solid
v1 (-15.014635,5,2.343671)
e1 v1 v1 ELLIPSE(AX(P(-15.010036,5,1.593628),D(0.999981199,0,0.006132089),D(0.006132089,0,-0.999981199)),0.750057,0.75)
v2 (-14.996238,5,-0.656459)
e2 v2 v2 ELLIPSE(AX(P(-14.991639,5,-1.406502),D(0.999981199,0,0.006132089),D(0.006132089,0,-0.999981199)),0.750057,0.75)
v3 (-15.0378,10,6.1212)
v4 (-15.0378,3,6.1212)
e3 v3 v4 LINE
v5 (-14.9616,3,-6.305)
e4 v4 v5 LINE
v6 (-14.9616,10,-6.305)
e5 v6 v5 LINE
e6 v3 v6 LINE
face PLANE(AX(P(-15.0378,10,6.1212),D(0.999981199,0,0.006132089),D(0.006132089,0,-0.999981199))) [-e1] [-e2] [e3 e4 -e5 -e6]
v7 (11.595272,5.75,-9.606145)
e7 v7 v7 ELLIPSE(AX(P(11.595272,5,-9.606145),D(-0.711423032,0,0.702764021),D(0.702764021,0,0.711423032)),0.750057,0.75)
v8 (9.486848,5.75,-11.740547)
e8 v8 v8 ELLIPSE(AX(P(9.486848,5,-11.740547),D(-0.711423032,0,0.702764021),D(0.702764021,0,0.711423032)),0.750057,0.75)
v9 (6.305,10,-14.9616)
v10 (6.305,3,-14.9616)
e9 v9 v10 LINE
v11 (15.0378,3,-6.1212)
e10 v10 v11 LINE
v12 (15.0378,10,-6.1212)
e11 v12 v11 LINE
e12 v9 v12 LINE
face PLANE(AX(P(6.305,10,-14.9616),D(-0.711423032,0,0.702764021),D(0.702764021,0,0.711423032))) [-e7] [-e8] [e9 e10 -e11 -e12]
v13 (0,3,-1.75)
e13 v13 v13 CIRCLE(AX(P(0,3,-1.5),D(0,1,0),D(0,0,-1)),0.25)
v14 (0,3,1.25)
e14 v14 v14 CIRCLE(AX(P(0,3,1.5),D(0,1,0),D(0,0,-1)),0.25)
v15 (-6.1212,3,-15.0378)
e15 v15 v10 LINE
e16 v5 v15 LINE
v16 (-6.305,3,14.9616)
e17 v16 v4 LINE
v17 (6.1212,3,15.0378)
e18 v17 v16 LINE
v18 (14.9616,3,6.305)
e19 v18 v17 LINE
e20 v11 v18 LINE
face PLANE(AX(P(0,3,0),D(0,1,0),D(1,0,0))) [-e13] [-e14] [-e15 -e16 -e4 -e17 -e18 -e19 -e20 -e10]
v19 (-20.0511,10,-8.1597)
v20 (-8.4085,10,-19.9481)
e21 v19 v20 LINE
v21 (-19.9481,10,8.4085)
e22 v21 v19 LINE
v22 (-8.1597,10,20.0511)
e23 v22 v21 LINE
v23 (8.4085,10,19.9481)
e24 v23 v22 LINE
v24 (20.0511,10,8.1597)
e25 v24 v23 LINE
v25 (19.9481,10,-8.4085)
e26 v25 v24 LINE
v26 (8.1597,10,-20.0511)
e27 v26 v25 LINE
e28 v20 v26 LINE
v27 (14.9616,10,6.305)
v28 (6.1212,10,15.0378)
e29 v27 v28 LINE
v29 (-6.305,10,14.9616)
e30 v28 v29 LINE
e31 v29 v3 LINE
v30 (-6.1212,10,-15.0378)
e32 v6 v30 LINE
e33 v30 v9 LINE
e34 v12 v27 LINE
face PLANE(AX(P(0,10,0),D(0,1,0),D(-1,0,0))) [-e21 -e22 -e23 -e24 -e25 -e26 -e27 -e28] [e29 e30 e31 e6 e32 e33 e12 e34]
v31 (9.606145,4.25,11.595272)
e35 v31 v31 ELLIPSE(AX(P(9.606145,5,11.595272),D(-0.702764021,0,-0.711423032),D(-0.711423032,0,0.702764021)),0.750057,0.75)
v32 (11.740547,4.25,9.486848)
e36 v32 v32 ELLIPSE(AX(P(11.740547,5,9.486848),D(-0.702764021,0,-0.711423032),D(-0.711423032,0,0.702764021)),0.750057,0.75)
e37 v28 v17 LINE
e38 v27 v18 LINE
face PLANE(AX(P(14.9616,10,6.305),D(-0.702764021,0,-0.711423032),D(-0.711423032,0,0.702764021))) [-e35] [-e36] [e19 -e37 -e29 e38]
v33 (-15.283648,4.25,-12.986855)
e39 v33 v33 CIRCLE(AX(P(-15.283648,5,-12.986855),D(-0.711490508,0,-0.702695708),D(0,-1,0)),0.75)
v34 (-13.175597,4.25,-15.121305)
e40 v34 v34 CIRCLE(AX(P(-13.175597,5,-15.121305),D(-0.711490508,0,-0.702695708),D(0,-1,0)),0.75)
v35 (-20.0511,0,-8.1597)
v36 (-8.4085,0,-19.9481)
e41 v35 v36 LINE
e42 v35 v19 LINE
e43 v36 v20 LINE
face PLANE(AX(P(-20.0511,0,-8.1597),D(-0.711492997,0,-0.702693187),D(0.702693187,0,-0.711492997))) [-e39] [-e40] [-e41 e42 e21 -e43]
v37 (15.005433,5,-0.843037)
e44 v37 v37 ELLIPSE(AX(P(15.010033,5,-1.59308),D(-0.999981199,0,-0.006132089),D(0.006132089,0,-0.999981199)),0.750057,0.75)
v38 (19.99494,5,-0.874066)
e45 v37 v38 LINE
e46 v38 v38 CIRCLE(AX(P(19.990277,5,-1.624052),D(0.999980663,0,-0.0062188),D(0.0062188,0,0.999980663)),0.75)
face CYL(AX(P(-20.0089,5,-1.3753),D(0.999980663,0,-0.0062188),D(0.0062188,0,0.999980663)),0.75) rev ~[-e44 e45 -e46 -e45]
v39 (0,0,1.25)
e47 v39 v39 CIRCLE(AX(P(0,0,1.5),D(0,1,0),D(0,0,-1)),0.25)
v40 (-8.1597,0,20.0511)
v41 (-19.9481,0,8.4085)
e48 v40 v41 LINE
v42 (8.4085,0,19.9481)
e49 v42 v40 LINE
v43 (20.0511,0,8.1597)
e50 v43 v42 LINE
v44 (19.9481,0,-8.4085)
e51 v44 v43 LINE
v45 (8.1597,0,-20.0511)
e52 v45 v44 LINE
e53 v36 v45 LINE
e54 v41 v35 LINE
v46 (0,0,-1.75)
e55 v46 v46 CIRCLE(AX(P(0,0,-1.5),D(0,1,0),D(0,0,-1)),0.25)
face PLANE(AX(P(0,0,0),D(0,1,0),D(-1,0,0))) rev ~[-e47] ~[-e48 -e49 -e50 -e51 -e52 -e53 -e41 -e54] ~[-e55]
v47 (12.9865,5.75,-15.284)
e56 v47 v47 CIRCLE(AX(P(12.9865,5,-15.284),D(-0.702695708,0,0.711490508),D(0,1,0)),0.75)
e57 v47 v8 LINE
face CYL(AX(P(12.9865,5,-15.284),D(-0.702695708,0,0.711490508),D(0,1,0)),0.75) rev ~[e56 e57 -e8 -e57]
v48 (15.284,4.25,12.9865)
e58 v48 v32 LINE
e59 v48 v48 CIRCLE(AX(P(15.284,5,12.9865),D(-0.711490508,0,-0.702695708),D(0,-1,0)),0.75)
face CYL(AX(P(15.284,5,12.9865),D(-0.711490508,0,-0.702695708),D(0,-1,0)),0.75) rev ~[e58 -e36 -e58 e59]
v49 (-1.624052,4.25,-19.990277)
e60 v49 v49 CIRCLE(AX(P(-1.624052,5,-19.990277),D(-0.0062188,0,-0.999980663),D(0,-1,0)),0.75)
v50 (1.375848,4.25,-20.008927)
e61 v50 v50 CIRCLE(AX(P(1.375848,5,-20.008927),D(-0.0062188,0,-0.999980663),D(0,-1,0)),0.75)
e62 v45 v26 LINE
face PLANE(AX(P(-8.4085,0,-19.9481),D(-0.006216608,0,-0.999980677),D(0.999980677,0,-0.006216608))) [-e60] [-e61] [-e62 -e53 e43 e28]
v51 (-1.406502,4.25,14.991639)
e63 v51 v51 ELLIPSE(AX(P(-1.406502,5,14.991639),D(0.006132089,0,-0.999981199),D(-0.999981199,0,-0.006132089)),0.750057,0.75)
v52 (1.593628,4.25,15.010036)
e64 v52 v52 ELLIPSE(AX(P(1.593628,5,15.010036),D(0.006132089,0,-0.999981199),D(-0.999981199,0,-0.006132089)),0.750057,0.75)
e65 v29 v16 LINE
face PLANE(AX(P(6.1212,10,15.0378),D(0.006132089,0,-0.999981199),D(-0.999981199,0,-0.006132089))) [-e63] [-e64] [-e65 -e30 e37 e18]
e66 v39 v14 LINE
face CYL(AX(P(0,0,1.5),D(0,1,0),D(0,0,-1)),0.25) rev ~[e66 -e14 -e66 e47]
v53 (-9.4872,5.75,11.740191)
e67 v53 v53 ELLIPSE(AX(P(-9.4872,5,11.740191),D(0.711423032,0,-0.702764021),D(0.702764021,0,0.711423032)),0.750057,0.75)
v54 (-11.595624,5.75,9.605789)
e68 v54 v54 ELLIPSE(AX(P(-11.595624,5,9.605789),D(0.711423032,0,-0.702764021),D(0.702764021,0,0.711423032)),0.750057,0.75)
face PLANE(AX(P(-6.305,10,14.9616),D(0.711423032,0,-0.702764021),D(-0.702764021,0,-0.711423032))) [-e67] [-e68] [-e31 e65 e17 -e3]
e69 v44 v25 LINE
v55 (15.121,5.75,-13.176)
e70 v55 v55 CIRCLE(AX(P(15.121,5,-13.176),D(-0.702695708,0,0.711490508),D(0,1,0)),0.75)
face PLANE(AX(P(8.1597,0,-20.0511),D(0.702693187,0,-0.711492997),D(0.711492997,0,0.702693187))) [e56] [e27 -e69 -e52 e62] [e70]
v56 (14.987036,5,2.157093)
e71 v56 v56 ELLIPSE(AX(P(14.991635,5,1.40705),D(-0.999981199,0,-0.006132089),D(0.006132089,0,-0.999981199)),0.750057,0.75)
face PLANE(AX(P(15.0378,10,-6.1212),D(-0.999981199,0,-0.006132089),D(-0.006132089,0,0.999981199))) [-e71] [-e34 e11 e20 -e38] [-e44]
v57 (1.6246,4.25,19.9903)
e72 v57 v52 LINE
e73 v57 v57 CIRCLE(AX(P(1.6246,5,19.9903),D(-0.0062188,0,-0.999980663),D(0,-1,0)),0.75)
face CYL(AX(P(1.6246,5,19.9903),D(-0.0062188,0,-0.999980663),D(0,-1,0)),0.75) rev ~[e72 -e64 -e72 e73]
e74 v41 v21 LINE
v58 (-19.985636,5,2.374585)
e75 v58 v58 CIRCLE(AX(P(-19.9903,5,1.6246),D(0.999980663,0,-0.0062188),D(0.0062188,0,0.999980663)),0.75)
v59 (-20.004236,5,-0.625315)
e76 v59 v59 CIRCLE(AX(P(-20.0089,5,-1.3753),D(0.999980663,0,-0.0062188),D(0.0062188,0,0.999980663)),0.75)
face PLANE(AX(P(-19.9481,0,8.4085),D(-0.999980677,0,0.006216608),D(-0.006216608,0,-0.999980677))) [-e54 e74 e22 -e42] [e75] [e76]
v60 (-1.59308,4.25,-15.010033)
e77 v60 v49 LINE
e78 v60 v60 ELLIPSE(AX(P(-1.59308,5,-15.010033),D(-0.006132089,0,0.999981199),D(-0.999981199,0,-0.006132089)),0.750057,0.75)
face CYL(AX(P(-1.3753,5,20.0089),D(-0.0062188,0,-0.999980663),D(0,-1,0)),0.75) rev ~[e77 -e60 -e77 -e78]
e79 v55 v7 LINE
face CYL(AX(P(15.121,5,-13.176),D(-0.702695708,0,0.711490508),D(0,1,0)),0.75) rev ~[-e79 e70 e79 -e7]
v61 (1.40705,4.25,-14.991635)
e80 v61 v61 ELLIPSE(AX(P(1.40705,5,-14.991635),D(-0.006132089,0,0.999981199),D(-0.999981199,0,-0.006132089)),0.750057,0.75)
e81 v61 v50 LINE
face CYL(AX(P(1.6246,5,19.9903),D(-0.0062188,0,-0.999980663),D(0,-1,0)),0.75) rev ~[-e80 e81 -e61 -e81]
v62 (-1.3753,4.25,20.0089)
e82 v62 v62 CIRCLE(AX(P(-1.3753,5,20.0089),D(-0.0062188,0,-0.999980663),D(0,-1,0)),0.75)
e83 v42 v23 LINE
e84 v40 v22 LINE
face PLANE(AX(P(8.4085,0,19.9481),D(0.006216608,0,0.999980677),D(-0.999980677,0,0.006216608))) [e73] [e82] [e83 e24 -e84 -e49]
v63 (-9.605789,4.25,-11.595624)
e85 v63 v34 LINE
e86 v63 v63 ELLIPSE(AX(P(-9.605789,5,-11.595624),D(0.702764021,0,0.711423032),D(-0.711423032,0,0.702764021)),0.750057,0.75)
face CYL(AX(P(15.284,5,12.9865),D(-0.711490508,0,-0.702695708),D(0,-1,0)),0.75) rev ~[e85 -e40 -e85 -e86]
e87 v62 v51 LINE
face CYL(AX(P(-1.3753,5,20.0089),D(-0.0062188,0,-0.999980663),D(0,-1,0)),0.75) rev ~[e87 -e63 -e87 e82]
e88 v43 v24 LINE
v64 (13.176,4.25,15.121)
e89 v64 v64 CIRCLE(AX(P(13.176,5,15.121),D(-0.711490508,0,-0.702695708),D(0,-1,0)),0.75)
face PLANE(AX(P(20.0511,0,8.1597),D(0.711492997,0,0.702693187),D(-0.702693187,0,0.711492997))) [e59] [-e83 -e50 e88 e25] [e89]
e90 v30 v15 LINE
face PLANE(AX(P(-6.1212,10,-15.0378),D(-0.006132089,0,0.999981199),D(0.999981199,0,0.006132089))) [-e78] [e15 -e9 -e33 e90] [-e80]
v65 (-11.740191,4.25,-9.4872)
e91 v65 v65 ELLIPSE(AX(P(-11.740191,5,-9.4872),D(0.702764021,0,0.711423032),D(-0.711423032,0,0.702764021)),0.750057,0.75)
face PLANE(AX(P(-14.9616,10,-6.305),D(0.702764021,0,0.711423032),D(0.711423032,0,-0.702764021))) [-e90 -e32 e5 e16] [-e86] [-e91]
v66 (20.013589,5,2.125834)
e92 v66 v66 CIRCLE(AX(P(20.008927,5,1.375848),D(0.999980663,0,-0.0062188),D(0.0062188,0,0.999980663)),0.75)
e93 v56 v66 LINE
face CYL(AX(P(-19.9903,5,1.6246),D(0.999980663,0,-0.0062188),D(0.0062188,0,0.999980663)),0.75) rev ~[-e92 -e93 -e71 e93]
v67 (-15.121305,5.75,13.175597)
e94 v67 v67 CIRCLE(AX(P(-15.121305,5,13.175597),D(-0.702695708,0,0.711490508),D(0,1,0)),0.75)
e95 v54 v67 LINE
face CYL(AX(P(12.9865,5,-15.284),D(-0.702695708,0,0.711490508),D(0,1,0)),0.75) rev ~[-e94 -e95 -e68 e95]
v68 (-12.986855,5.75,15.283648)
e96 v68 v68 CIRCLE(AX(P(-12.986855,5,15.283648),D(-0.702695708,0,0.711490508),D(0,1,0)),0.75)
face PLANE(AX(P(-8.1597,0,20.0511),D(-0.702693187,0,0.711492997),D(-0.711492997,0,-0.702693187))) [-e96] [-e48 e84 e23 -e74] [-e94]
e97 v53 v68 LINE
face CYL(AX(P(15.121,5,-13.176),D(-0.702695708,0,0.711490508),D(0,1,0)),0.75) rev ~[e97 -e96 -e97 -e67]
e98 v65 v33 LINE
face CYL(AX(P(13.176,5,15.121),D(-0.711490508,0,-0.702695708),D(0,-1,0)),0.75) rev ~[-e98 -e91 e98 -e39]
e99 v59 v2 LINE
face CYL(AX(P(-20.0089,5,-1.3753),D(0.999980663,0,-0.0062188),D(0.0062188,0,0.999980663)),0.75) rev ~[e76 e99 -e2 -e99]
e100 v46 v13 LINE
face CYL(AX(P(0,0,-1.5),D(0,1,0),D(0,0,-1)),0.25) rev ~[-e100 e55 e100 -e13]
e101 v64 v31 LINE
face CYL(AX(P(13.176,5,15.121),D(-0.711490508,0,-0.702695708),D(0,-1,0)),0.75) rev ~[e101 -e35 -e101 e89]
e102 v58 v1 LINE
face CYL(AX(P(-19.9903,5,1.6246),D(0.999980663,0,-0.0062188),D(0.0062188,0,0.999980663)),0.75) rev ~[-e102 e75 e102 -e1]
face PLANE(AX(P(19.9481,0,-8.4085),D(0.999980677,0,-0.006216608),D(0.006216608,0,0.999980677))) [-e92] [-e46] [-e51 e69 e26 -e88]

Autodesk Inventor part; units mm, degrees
ref_plane "YZ Plane" through (0, 0, 0) normal (1, 0, 0) x (0, 1, 0)
ref_plane "XZ Plane" through (0, 0, 0) normal (0, 1, 0) x (-1, 0, 0)
ref_plane "XY Plane" through (0, 0, 0) normal (0, 0, 1) x (1, 0, 0)
sketch "Sketch2" plane through (0, 0, 0) normal (0, 1, 0) x (-1, 0, 0)
  line L0 (8.4085, -19.9481) -> (-8.1597, -20.0511)
  line L1 (-8.1597, -20.0511) -> (-19.9481, -8.4085)
  line L2 (-19.9481, -8.4085) -> (-20.0511, 8.1597)
  line L3 (-20.0511, 8.1597) -> (-8.4085, 19.9481)
  line L4 (-8.4085, 19.9481) -> (8.1597, 20.0511)
  line L5 (8.1597, 20.0511) -> (19.9481, 8.4085)
  line L6 (19.9481, 8.4085) -> (20.0511, -8.1597)
  line L7 (20.0511, -8.1597) -> (8.4085, -19.9481)
  point P0 (0, 0)
  point P1 (0, 0)
  dimension "d12" = 20
  dimension "d13" = 16.5682
extrude "Extrusion1" add sketch "Sketch2" along normal blind 10
sketch "Sketch3" plane through (0, 10, 0) normal (0, 1, 0) x (1, 0, 0)
  line L0 (-6.1212, 15.0378) -> (6.305, 14.9616)
  line L1 (6.305, 14.9616) -> (15.0378, 6.1212)
  line L2 (15.0378, 6.1212) -> (14.9616, -6.305)
  line L3 (14.9616, -6.305) -> (6.1212, -15.0378)
  line L4 (6.1212, -15.0378) -> (-6.305, -14.9616)
  line L5 (-6.305, -14.9616) -> (-15.0378, -6.1212)
  line L6 (-15.0378, -6.1212) -> (-14.9616, 6.305)
  line L7 (-14.9616, 6.305) -> (-6.1212, 15.0378)
  point P0 (0, 0)
  point P1 (0, 0)
  dimension "d16" = 15
  dimension "d17" = 12.4262
extrude "Extrusion2" cut sketch "Sketch3" against normal blind 7
sketch "Sketch4" plane through (0, 0, 0) normal (0, -1, 0) x (1, 0, 0)
  point P0 (0, 0)
  point P1 (0, 1.5)
  point P2 (0, -1.5)
hole "Hole1" at (0, 0, 1.5) at (0, 0, -1.5) direction (0, 1, 0) diameter 0.5 end through all
sketch "Sketch5" plane through (8.4085, 0, 19.9481) normal (0.0062188, 0, 0.9999807) x (0.9999807, 0, -0.0062188)
  line L0 (-8.2843, 0) -> (-8.2843, 10)
  line L1 (-2.2567, 10) -> (-14.6822, 10) projected
  line L2 (0, 0) -> (0, 10) projected
  line L3 (0, 5) -> (-16.5685, 5)
  line L4 (-16.5685, 0) -> (-16.5685, 10) projected
  point P0 (-9.784, 5)
  point P1 (-6.784, 5)
hole "Hole2" at (-1.3753, 5, 20.0089) at (1.6246, 5, 19.9903) direction (-0.0062188, 0, -0.9999807) diameter 1.5 end through all
sketch "Sketch6" plane through (-19.9481, 0, 8.4085) normal (-0.9999807, 0, 0.0062188) x (0.0062188, 0, 0.9999807)
  line L0 (-8.2843, 0) -> (-8.2843, 10)
  line L1 (-2.2567, 10) -> (-14.6822, 10) projected
  line L2 (-16.5685, 0) -> (-16.5685, 10) projected
  line L3 (-16.5685, 5) -> (0, 5)
  line L4 (0, 0) -> (0, 10) projected
  point P0 (-6.784, 5)
  point P1 (-9.784, 5)
hole "Hole3" at (-19.9903, 5, 1.6246) at (-20.0089, 5, -1.3753) direction (0.9999807, 0, -0.0062188) diameter 1.5 end through all
sketch "Sketch7" plane through (20.0511, 0, 8.1597) normal (0.7114905, 0, 0.7026957) x (0.7026957, 0, -0.7114905)
  line L0 (-8.2843, 0) -> (-8.2843, 10)
  line L1 (-2.2567, 10) -> (-14.6822, 10) projected
  line L2 (-16.5685, 0) -> (-16.5685, 10) projected
  line L3 (-16.5685, 5) -> (0, 5)
  line L4 (0, 0) -> (0, 10) projected
  point P0 (-9.784, 5)
  point P1 (-6.784, 5)
hole "Hole4" at (13.176, 5, 15.121) at (15.284, 5, 12.9865) direction (-0.7114905, 0, -0.7026957) diameter 1.5 end through all
sketch "Sketch8" plane through (8.1597, 0, -20.0511) normal (0.7026957, 0, -0.7114905) x (-0.7114905, 0, -0.7026957)
  line L0 (-8.2843, 0) -> (-8.2843, 10)
  line L1 (-16.5685, 10) -> (0, 10) projected
  line L2 (-16.5685, 0) -> (-16.5685, 10) projected
  line L3 (-16.5685, 5) -> (0.0284, 5)
  point P0 (-9.784, 5)
  point P1 (-6.784, 5)
hole "Hole5" at (15.121, 5, -13.176) at (12.9865, 5, -15.284) direction (-0.7026957, 0, 0.7114905) diameter 1.5 end through all
properties part number "oktagonOben"
